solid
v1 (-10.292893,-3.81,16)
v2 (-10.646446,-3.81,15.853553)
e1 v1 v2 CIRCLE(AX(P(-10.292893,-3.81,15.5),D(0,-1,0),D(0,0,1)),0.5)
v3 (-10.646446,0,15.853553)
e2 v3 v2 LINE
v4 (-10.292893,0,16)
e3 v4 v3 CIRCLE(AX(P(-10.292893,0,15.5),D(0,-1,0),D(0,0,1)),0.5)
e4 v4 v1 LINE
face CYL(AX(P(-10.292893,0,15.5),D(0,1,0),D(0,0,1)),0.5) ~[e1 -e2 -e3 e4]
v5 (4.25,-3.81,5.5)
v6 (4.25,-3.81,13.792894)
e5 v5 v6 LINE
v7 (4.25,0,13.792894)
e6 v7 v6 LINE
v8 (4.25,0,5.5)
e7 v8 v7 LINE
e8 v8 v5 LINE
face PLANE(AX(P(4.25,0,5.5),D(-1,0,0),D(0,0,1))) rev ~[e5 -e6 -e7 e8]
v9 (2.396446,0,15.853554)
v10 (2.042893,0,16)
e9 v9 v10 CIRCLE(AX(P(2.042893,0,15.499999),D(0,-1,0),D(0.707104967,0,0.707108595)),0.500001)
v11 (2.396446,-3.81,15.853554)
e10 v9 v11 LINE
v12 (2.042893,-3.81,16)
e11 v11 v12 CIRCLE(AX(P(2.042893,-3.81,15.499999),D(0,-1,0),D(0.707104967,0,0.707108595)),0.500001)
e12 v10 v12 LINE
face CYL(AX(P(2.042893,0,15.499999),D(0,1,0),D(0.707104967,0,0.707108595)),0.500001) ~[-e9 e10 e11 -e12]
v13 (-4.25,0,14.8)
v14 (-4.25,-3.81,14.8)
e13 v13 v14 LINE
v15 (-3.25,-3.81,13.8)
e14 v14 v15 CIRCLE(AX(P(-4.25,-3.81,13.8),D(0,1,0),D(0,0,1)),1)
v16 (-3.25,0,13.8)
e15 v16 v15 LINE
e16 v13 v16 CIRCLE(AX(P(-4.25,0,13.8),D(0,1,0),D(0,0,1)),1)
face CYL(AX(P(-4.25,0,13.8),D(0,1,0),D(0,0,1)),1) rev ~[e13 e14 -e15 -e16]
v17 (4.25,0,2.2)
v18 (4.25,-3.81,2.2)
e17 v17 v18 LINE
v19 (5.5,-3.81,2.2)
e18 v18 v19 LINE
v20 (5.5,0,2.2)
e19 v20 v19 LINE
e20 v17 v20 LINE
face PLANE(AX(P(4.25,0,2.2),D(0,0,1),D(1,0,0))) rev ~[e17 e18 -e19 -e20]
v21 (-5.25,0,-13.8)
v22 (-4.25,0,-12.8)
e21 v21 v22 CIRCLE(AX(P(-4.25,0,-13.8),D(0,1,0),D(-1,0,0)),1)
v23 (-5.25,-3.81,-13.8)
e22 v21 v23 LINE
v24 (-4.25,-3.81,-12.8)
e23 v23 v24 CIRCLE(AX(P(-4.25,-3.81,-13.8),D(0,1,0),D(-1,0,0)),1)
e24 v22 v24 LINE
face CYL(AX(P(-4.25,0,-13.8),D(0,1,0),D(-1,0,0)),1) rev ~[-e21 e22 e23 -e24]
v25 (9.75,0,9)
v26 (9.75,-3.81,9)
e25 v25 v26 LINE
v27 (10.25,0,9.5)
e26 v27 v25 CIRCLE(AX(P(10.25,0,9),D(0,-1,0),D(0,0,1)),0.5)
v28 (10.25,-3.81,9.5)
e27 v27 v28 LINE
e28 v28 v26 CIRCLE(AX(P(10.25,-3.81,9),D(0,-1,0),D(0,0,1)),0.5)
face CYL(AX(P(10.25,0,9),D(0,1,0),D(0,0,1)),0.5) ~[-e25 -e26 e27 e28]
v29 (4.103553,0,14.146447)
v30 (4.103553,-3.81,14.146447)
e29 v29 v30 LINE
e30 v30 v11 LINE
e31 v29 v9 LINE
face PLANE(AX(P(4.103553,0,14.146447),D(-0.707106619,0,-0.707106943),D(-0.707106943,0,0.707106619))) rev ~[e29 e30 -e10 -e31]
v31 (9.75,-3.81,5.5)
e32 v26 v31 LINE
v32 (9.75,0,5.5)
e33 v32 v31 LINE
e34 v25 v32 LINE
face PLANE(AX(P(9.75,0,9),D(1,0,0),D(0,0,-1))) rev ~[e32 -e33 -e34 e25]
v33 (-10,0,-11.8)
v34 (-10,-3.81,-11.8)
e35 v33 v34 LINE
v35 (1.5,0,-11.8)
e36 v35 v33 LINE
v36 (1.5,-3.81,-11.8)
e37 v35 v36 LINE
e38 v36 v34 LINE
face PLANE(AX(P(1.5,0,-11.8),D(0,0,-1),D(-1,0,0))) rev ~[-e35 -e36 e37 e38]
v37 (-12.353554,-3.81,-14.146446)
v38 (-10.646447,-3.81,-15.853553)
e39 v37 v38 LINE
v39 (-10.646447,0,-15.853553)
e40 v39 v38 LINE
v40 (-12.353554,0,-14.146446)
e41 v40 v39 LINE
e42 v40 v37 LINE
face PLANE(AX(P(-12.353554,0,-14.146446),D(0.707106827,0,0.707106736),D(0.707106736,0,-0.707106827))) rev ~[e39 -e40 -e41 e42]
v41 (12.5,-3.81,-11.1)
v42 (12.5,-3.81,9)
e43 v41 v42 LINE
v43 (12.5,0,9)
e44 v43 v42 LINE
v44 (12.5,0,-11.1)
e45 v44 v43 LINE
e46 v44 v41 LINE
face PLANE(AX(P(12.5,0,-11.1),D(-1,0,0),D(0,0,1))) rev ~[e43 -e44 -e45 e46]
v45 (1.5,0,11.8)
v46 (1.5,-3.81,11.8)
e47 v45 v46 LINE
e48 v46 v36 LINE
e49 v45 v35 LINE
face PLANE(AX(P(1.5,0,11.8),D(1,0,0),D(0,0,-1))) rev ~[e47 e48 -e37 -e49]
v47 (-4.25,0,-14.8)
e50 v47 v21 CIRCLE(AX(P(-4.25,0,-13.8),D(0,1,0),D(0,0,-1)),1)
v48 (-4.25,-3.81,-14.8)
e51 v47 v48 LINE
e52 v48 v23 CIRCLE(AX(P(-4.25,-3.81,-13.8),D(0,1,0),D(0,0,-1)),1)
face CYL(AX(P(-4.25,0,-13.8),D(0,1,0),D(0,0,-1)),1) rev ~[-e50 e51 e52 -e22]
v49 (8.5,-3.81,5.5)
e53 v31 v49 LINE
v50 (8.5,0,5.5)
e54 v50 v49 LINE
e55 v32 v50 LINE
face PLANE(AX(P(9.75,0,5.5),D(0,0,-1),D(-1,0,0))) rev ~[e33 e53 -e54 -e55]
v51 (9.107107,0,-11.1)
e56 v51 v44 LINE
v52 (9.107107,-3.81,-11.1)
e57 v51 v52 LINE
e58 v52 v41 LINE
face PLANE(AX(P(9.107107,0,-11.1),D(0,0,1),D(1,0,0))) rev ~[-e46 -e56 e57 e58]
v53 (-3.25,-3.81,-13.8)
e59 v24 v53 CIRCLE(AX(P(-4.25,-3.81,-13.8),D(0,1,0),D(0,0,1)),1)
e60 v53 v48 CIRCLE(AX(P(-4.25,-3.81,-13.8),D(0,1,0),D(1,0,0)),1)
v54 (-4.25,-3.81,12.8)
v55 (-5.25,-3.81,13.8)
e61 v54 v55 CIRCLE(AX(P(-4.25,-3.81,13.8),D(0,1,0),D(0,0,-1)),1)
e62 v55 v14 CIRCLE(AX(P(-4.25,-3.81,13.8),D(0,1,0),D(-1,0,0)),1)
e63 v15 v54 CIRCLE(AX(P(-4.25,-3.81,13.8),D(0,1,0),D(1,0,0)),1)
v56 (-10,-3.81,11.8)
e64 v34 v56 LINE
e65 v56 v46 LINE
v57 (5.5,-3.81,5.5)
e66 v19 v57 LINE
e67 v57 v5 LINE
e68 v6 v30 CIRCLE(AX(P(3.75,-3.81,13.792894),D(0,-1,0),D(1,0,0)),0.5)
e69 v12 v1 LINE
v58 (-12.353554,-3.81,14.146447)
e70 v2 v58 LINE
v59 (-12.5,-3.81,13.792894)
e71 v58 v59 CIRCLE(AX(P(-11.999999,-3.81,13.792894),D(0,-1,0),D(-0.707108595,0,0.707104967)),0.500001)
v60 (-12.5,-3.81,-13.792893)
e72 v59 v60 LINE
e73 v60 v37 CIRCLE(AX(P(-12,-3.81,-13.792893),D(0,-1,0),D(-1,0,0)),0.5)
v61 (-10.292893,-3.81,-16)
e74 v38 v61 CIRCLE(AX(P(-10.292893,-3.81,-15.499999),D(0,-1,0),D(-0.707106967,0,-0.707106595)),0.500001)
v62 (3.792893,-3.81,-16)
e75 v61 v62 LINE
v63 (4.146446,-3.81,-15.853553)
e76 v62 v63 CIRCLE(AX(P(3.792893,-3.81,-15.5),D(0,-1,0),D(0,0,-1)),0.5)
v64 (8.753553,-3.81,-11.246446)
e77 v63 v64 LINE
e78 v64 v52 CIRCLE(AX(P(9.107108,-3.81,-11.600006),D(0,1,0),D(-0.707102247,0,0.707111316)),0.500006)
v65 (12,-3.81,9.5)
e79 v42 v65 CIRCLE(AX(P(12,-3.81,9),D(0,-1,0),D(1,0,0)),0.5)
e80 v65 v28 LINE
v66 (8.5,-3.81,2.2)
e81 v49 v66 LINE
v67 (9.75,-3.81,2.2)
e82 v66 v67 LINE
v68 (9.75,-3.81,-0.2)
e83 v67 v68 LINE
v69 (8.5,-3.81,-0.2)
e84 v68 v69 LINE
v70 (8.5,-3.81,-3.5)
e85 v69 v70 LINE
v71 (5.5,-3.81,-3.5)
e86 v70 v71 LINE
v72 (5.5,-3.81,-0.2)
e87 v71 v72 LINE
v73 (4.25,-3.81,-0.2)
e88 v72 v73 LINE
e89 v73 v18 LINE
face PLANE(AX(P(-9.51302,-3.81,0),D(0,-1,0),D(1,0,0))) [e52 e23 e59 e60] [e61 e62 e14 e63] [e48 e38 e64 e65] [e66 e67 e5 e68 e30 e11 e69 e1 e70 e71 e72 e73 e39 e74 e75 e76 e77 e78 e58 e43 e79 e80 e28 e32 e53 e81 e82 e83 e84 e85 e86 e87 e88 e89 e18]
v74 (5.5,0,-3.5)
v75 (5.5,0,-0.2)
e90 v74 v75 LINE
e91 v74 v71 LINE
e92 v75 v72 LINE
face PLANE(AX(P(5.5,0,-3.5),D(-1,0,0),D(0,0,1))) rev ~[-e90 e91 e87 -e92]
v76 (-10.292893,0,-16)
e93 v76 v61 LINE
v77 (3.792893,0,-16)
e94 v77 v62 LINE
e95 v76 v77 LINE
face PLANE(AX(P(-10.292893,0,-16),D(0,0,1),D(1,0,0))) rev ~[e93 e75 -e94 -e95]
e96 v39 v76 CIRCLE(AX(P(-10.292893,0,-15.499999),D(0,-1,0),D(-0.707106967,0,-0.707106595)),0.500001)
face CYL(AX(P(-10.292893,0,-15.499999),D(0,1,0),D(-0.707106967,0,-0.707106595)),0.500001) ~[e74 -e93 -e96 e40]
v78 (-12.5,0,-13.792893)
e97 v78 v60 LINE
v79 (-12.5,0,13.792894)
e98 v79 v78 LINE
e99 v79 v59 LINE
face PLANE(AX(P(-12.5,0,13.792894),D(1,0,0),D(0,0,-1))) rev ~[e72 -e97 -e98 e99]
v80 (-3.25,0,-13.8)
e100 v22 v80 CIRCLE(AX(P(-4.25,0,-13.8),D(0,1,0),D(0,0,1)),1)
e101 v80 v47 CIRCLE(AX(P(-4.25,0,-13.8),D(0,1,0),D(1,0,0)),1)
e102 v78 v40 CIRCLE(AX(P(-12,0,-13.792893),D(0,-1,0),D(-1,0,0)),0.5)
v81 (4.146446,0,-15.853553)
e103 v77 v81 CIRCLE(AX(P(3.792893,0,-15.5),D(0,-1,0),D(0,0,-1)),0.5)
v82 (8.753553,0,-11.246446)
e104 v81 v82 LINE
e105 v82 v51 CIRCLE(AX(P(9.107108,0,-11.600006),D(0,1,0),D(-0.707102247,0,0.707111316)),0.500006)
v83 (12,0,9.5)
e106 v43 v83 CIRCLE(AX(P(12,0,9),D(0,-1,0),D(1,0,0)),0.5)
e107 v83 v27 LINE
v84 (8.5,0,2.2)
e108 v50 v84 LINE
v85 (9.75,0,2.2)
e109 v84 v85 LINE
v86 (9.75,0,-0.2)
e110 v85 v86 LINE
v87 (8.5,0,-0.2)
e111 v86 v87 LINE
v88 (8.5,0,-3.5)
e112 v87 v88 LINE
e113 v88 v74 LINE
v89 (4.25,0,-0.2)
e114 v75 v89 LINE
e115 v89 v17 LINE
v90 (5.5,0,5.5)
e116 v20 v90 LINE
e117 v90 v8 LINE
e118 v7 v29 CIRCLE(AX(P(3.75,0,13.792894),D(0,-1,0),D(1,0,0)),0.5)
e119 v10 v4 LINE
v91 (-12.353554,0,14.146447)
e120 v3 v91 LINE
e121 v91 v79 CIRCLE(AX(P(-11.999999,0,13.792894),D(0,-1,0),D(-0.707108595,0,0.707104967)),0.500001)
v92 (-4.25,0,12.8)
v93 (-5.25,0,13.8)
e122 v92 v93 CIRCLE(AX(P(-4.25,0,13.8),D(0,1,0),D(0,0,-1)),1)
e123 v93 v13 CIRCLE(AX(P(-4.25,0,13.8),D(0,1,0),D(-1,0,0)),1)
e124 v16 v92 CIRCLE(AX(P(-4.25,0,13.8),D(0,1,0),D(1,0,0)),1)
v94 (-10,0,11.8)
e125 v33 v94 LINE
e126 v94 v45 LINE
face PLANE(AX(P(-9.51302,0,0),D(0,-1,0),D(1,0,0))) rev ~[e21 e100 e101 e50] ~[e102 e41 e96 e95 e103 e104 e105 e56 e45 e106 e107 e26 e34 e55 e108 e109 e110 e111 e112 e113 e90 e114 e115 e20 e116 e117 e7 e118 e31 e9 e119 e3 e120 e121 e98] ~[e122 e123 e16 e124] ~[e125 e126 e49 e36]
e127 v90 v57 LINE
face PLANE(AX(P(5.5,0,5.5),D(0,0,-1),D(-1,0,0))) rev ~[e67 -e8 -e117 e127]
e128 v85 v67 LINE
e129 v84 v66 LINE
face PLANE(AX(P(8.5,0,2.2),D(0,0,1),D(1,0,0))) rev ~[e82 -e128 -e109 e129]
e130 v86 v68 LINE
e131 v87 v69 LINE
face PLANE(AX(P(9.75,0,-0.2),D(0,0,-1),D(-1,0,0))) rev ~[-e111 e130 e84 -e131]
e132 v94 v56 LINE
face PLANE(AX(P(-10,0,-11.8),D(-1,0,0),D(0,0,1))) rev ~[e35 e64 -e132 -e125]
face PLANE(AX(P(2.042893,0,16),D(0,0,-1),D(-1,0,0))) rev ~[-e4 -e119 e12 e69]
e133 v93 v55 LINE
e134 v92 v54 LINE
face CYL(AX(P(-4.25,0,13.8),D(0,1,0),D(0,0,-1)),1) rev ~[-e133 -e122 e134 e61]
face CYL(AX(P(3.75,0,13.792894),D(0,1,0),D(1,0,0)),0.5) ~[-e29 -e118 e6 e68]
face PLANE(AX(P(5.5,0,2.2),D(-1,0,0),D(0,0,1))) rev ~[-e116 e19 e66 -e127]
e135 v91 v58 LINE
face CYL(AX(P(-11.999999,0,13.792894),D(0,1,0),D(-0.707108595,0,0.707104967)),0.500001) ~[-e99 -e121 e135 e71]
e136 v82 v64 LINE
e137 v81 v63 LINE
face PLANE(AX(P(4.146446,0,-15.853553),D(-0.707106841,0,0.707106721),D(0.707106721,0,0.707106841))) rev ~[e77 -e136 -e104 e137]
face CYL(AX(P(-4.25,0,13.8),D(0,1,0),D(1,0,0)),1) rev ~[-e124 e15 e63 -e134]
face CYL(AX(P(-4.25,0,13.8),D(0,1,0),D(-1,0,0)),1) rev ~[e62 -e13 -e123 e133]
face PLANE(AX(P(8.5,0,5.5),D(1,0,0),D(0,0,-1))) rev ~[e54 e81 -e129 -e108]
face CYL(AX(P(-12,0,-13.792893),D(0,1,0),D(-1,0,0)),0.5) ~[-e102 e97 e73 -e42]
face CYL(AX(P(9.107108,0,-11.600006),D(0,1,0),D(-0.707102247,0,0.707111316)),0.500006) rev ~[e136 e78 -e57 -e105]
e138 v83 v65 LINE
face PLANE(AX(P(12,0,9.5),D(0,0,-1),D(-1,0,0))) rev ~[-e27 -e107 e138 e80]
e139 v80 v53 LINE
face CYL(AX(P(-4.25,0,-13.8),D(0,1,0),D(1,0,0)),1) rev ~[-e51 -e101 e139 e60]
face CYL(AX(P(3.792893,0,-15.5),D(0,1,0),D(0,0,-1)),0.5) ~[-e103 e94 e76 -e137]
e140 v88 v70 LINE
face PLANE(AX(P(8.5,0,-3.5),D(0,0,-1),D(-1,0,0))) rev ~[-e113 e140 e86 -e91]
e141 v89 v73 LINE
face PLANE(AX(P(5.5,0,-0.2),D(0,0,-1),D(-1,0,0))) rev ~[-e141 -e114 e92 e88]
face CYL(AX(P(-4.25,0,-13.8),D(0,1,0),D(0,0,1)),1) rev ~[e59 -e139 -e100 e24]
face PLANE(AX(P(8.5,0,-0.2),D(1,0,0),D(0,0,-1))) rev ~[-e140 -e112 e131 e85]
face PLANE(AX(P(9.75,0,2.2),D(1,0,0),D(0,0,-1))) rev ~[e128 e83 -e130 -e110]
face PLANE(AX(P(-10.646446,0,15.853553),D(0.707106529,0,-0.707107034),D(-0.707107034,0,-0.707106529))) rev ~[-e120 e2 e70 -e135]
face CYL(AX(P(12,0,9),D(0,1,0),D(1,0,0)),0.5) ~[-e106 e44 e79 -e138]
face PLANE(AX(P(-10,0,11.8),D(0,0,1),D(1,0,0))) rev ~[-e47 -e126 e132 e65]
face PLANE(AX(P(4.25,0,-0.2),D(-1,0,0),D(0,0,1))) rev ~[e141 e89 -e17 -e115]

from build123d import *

# Parameters (mm, degrees)
F1_DEPTH = 3.81


# Not quite as in the source:
# - ends of sketch curves that miss each other by under 0.0002 mm in the source are joined


with BuildPart() as f1:
    # F0 (on Front) → F1 (new body)
    with BuildSketch(Plane.XZ):
        with BuildLine():
            Line((-10.292893, -16), (-4.25, -16))
            Line((-4.25, -16), (-4.25, -14.8))
            ThreePointArc((-4.25, -14.8), (-4.9571067812, -14.5071067812), (-5.25, -13.8))
            ThreePointArc((-5.25, -13.8), (-4.9571067812, -13.0928932188), (-4.25, -12.8))
            Line((-4.25, -12.8), (-4.25, -11.8))
            Line((-4.25, -11.8), (-10, -11.8))
            Line((-10, -11.8), (-10, 11.8))
            Line((-10, 11.8), (-4.25, 11.8))
            Line((-4.25, 11.8), (-4.25, 12.8))
            ThreePointArc((-4.25, 12.8), (-4.9571067812, 13.0928932188), (-5.25, 13.8))
            ThreePointArc((-5.25, 13.8), (-4.9571067812, 14.5071067812), (-4.25, 14.8))
            Line((-4.25, 14.8), (-4.25, 16))
            Line((-4.25, 16), (-10.292893, 16))
            ThreePointArc((-10.292893, 16), (-10.4842347162, 15.9619397663), (-10.6464463906, 15.8535533906))
            Line((-10.6464463906, 15.8535533906), (-12.353554, 14.146447))
            ThreePointArc((-12.353554, 14.146447), (-12.4619399016, 13.9842353895), (-12.5, 13.792894))
            Line((-12.5, 13.792894), (-12.5, -13.792893))
            ThreePointArc((-12.5, -13.792893), (-12.4619399016, -13.9842343895), (-12.3535538906, -14.1464458906))
            Line((-12.3535538906, -14.1464458906), (-10.646447, -15.853553))
            ThreePointArc((-10.646447, -15.853553), (-10.4842350428, -15.961939631), (-10.292893, -16))
        make_face()
        with BuildLine():
            Line((12.5, -11.1), (12.5, 9))
            ThreePointArc((12.5, 9), (12.3535533906, 9.3535533906), (12, 9.5))
            Line((12, 9.5), (10.25, 9.5))
            ThreePointArc((10.25, 9.5), (9.8964466094, 9.3535533906), (9.75, 9))
            Line((9.75, 9), (9.75, 5.5))
            Line((9.75, 5.5), (8.5, 5.5))
            Line((8.5, 5.5), (8.5, 2.2))
            Line((8.5, 2.2), (9.75, 2.2))
            Line((9.75, 2.2), (9.75, -0.2))
            Line((9.75, -0.2), (8.5, -0.2))
            Line((8.5, -0.2), (8.5, -3.5))
            Line((8.5, -3.5), (5.5, -3.5))
            Line((5.5, -3.5), (5.5, -0.2))
            Line((5.5, -0.2), (4.25, -0.2))
            Line((4.25, -0.2), (4.25, 2.2))
            Line((4.25, 2.2), (5.5, 2.2))
            Line((5.5, 2.2), (5.5, 5.5))
            Line((5.5, 5.5), (4.25, 5.5))
            Line((4.25, 5.5), (4.25, 13.792894))
            ThreePointArc((4.25, 13.792894), (4.2119397663, 13.9842357162), (4.1035533906, 14.1464473906))
            Line((4.1035533906, 14.1464473906), (2.396446, 15.853554))
            ThreePointArc((2.396446, 15.853554), (2.2342343895, 15.9619399016), (2.042893, 16))
            Line((2.042893, 16), (-4.25, 16))
            Line((-4.25, 16), (-4.25, 14.8))
            ThreePointArc((-4.25, 14.8), (-3.5428932188, 14.5071067812), (-3.25, 13.8))
            ThreePointArc((-3.25, 13.8), (-3.5428932188, 13.0928932188), (-4.25, 12.8))
            Line((-4.25, 12.8), (-4.25, 11.8))
            Line((-4.25, 11.8), (1.5, 11.8))
            Line((1.5, 11.8), (1.5, -11.8))
            Line((1.5, -11.8), (-4.25, -11.8))
            Line((-4.25, -11.8), (-4.25, -12.8))
            ThreePointArc((-4.25, -12.8), (-3.5428932188, -13.0928932188), (-3.25, -13.8))
            ThreePointArc((-3.25, -13.8), (-3.5428932188, -14.5071067812), (-4.25, -14.8))
            Line((-4.25, -14.8), (-4.25, -16))
            Line((-4.25, -16), (3.792893, -16))
            ThreePointArc((3.792893, -16), (3.9842347162, -15.9619397663), (4.1464463906, -15.8535533906))
            Line((4.1464463906, -15.8535533906), (8.753553, -11.246446))
            ThreePointArc((8.753553, -11.246446), (8.9157652838, -11.1380602337), (9.107107, -11.1))
            Line((9.107107, -11.1), (12.5, -11.1))
        make_face()
    extrude(amount=F1_DEPTH)


solid = f1.part
